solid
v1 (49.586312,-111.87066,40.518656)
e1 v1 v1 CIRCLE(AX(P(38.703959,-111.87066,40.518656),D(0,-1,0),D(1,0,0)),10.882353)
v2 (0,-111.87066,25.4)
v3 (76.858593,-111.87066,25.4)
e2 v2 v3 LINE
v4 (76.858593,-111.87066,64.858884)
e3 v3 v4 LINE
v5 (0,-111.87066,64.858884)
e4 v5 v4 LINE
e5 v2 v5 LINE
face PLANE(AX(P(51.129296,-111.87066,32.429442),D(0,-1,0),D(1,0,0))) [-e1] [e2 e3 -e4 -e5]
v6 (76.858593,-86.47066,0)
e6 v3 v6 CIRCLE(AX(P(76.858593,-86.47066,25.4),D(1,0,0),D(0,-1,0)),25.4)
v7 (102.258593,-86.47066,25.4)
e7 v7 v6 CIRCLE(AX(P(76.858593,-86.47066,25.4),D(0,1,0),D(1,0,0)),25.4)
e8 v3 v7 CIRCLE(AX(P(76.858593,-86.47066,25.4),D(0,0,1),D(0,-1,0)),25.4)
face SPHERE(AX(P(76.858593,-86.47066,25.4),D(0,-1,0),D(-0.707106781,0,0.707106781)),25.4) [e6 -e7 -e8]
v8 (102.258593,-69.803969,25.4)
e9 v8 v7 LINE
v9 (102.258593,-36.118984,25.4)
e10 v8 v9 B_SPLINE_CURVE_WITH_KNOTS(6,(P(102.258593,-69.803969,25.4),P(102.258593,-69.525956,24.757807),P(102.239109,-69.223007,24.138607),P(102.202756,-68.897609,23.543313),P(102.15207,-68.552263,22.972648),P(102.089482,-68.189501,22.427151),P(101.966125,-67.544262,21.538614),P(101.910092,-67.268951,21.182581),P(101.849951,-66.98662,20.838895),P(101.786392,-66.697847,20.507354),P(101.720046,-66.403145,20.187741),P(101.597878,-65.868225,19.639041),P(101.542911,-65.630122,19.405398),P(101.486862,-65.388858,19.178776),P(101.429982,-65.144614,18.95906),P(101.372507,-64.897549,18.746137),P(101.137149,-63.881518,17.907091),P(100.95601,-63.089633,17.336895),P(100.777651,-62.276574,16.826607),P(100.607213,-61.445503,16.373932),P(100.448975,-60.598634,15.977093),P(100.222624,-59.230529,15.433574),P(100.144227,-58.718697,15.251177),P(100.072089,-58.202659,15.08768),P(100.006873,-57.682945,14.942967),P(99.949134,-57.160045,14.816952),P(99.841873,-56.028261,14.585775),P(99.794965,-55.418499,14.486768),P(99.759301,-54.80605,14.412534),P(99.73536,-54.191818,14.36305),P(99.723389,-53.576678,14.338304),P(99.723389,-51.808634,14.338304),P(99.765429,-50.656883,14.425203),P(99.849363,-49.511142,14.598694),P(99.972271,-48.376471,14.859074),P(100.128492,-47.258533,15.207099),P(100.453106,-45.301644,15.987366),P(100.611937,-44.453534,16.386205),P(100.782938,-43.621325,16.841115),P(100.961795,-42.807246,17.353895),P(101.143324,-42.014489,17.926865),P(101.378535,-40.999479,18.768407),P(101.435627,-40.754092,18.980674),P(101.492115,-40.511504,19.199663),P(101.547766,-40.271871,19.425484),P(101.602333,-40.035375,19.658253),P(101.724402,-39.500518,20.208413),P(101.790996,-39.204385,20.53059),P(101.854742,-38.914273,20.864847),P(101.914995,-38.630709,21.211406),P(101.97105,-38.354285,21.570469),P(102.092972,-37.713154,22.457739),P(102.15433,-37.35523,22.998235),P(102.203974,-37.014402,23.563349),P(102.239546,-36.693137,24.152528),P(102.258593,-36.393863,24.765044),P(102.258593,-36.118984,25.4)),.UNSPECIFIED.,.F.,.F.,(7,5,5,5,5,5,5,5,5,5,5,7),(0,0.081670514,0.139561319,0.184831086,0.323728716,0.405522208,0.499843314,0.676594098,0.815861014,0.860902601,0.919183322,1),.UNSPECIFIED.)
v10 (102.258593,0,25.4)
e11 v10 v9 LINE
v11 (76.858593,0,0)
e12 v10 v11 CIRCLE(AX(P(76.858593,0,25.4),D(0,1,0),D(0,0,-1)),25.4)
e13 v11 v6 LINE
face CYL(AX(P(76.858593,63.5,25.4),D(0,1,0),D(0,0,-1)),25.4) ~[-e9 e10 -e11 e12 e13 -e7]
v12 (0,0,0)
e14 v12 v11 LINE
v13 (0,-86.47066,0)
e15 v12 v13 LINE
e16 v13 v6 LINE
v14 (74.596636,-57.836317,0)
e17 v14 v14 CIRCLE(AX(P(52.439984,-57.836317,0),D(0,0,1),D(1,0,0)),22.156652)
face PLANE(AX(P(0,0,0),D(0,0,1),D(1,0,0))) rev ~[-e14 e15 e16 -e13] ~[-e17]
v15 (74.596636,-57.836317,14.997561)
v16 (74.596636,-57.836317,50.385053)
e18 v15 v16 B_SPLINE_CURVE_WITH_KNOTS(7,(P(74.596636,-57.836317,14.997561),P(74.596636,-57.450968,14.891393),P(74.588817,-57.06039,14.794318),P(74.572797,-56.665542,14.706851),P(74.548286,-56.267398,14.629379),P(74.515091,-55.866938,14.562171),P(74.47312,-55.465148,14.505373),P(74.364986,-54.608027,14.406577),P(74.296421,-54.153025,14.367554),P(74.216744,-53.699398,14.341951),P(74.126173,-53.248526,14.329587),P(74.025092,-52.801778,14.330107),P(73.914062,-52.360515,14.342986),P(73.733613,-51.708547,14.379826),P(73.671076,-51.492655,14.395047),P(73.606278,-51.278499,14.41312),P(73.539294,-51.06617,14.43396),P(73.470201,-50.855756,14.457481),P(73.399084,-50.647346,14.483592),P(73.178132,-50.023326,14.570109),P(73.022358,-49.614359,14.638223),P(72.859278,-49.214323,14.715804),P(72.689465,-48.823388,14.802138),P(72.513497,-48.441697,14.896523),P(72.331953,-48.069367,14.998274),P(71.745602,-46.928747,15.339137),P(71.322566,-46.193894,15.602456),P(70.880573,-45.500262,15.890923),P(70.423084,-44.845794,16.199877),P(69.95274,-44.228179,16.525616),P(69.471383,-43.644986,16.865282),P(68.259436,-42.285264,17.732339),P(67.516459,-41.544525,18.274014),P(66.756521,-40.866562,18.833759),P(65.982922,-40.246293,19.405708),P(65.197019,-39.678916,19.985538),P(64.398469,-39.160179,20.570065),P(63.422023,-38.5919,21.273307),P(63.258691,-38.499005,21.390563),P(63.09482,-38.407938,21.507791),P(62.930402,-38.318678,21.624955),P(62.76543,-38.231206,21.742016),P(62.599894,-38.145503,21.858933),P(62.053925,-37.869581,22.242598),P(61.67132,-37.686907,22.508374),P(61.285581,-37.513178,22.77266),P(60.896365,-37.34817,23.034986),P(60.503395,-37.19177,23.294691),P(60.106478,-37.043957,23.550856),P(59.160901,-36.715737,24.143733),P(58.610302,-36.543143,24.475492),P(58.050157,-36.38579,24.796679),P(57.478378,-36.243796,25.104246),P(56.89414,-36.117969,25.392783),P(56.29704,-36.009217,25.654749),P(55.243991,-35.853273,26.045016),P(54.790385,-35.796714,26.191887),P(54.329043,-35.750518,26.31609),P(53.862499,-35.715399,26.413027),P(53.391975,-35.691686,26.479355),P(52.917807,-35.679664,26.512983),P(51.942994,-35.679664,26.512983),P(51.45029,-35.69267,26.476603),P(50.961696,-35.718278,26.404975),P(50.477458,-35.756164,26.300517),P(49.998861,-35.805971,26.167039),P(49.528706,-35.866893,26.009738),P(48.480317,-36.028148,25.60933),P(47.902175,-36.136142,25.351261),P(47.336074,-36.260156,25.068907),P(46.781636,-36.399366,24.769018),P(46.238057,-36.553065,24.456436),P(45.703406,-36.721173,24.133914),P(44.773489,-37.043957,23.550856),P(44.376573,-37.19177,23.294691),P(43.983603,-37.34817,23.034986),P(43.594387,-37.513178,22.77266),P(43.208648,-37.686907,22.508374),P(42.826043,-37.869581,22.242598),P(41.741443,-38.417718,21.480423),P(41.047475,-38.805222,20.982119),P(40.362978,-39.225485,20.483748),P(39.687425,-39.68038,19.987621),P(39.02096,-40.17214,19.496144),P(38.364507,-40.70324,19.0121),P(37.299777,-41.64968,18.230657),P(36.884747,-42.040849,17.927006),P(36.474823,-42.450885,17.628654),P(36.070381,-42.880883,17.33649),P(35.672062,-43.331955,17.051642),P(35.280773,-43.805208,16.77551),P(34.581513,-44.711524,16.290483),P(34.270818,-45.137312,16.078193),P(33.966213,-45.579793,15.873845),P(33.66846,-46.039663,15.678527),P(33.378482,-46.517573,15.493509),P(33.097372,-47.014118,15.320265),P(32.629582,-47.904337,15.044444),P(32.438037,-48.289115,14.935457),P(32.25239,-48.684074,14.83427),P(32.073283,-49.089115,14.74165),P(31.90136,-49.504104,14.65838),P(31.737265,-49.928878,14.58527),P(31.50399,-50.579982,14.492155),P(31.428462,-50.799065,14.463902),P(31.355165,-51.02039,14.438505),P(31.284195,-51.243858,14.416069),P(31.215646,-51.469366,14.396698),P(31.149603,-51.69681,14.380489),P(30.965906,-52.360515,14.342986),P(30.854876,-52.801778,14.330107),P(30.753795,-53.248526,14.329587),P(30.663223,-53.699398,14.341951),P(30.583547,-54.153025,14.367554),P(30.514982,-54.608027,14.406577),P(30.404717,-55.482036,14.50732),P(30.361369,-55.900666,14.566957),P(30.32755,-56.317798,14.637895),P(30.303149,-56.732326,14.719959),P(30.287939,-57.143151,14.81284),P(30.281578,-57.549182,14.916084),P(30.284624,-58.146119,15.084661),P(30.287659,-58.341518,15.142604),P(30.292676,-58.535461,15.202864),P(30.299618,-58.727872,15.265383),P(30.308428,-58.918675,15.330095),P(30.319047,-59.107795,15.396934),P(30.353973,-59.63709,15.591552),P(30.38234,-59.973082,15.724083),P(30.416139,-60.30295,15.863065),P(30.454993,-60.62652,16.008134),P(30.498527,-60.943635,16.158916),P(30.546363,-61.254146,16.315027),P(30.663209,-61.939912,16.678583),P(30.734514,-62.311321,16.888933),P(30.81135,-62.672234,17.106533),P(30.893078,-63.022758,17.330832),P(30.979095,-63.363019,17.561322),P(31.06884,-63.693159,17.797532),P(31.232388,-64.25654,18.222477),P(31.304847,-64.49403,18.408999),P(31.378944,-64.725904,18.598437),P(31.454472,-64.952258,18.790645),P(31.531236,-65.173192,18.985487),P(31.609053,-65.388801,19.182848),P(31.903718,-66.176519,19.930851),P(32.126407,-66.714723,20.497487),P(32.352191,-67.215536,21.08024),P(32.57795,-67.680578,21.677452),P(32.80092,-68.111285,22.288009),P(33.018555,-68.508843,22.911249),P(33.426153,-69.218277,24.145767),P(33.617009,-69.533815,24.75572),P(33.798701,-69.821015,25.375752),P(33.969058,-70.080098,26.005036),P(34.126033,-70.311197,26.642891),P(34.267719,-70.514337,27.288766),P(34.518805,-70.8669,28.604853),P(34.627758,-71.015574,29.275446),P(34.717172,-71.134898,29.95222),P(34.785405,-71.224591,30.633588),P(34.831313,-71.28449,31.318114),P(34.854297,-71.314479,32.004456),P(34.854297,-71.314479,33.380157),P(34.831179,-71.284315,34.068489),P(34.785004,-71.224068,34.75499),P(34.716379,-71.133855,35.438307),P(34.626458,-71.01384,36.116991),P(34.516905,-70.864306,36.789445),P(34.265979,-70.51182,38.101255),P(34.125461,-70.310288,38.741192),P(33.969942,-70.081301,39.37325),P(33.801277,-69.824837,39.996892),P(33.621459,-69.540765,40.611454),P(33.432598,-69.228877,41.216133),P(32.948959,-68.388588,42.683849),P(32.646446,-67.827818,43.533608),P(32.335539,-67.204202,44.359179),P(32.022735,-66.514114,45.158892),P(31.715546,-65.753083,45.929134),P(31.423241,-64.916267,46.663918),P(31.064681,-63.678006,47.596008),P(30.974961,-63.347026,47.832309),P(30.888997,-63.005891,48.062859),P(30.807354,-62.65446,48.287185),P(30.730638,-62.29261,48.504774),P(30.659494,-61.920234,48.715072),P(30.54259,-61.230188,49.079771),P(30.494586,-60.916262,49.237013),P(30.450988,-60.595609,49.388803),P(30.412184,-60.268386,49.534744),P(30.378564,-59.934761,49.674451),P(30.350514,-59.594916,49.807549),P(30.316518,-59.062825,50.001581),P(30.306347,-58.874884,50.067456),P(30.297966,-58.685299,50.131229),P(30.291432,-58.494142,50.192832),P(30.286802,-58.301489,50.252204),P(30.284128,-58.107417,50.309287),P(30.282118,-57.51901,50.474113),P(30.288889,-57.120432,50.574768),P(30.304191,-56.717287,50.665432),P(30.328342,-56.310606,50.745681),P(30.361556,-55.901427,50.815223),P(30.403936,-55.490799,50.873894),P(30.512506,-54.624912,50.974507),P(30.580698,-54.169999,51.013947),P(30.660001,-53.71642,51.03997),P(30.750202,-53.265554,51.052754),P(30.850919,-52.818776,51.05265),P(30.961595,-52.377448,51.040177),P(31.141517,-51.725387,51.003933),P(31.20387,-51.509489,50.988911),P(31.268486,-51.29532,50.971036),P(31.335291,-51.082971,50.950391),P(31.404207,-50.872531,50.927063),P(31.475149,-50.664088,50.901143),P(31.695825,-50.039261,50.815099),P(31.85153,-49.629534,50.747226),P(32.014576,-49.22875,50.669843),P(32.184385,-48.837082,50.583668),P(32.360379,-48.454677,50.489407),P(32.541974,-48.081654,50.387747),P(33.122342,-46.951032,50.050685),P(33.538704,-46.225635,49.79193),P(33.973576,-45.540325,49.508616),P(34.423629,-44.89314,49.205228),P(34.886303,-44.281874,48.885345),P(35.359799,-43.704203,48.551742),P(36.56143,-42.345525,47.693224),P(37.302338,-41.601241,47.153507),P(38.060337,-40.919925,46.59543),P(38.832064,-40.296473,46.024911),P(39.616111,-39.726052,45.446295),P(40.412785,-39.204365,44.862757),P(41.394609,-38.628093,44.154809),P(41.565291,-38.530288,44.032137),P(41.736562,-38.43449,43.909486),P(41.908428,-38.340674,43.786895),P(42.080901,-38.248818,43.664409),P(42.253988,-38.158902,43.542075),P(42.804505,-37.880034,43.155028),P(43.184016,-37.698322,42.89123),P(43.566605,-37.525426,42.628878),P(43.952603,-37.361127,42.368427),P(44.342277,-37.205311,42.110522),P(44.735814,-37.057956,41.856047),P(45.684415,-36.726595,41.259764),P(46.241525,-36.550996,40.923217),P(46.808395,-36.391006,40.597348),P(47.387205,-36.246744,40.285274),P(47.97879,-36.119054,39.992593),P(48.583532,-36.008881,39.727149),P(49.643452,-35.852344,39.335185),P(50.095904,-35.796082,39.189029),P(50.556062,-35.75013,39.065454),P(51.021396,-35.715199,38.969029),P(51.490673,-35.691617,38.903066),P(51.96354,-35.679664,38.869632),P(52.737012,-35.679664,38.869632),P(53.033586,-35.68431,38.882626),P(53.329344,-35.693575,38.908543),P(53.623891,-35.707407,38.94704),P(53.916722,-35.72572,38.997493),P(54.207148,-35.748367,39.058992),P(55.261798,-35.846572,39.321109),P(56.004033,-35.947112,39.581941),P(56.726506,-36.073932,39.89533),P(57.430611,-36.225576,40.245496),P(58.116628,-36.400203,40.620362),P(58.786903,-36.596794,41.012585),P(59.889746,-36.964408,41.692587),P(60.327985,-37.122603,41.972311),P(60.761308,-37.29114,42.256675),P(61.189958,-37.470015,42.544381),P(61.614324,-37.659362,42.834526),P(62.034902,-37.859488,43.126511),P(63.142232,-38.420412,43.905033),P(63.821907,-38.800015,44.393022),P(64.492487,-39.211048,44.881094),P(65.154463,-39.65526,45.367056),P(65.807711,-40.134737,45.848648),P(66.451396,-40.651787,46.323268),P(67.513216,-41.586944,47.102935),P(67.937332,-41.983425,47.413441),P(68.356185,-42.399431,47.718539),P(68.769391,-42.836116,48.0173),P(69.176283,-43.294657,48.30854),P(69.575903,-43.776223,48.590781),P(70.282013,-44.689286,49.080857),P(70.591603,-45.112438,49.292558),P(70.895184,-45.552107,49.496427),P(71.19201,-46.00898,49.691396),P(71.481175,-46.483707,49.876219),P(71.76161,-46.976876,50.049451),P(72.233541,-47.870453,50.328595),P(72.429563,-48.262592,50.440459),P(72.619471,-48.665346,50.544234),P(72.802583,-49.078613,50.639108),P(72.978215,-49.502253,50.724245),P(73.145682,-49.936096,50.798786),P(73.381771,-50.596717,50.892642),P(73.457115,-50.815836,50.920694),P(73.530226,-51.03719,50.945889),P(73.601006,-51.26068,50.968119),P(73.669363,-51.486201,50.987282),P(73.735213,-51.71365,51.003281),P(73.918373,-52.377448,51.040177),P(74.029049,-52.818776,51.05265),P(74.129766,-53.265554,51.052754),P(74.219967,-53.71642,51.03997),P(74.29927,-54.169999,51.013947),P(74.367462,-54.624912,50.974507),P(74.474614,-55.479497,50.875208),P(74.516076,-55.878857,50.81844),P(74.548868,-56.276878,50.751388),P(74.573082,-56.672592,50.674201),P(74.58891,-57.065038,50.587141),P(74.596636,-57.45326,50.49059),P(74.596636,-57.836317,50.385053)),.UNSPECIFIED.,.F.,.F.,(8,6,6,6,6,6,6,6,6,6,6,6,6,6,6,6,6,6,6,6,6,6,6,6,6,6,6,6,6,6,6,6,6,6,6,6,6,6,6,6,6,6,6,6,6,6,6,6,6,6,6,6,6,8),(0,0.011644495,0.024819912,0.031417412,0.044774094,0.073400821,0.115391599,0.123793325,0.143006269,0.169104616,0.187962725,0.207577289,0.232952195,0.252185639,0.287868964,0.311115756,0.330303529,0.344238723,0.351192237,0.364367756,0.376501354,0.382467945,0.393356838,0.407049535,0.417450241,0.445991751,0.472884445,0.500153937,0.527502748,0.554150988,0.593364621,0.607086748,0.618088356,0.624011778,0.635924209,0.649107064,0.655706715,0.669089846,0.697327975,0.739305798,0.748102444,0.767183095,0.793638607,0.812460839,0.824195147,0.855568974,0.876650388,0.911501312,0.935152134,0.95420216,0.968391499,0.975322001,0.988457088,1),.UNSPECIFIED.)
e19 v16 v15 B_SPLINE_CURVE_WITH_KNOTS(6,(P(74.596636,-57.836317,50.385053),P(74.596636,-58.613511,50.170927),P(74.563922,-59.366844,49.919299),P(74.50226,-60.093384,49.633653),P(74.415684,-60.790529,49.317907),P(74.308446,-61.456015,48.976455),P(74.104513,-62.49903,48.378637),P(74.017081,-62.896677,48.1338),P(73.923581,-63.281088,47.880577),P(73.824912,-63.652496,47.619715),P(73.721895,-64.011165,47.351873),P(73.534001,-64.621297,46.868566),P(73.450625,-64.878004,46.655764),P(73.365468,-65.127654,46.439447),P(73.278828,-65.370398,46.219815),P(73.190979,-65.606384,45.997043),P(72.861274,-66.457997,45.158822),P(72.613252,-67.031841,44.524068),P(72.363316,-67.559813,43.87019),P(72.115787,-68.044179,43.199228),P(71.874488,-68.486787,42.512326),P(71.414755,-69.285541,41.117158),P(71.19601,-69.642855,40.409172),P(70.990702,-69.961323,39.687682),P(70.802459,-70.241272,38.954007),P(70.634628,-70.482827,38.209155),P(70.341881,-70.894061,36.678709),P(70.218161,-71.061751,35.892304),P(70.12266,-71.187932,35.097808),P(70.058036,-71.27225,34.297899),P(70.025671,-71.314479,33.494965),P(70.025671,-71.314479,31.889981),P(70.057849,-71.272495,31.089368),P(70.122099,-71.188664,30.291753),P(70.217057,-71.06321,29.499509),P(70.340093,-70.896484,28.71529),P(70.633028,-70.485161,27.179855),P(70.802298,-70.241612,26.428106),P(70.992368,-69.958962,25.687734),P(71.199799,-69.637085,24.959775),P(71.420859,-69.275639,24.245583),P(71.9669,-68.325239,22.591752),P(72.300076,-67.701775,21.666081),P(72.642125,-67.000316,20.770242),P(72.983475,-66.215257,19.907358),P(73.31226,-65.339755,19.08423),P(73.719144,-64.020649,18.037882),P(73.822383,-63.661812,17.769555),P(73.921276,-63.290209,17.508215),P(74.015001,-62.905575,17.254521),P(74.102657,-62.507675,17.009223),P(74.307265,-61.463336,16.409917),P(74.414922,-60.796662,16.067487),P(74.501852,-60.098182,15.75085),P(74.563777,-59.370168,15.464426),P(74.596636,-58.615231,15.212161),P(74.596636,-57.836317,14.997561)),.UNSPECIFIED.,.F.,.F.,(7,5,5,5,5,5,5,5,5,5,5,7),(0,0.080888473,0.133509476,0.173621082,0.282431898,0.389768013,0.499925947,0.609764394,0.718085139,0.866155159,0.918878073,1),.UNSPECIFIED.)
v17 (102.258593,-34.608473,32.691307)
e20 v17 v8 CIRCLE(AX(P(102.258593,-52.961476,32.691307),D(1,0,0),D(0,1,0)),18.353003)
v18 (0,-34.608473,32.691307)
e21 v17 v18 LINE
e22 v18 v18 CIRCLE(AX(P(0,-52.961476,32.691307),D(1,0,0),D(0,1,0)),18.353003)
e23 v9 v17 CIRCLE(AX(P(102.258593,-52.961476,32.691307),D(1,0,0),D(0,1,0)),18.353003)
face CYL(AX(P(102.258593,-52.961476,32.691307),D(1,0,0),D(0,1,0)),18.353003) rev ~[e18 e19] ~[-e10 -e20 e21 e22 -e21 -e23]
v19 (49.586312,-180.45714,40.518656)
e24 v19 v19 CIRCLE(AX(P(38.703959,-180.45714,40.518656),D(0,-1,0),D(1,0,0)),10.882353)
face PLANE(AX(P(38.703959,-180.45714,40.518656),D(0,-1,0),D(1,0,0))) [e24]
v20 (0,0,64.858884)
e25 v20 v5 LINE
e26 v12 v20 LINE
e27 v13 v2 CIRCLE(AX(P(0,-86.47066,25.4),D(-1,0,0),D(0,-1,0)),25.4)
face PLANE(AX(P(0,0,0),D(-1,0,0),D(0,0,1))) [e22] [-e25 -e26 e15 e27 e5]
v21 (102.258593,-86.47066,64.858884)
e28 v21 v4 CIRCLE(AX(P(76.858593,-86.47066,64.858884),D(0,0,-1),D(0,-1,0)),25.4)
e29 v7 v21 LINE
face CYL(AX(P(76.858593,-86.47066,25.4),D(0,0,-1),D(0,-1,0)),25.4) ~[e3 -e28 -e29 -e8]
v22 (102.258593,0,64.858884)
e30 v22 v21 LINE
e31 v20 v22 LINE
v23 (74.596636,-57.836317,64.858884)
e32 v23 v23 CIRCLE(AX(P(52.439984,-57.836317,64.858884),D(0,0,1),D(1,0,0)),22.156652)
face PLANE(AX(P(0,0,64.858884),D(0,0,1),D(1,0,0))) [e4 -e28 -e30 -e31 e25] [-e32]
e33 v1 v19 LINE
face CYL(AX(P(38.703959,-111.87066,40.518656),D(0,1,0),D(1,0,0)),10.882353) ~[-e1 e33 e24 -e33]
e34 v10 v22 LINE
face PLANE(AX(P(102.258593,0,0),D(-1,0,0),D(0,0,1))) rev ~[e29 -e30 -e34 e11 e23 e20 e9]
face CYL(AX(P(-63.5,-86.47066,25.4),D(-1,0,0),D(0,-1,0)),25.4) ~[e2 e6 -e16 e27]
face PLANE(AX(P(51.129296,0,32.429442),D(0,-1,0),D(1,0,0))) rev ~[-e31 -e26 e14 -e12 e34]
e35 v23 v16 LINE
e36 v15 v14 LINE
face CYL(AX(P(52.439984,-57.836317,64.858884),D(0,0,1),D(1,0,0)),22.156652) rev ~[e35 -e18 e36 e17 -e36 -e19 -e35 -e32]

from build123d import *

# Parameters (mm, degrees)
F0_W         = 102.258592844
F0_H         = 64.8588836193
F1_DEPTH     = 111.87066
F2_R         = 22.1566524367
F3_DEPTH     = 123.47648
F4_R         = 18.3530030386
F5_DEPTH     = 205.67378
F6_T1_DEPTH  = 140.358592844
F6_T3_DEPTH  = 102.9588836193
F6_T5_DEPTH  = 149.97066
F6_S9_W      = 25.4
F6_S9_H      = 25.4
F6_T10_DEPTH = 25.4
F7_R         = 10.8823528673
F8_DEPTH     = 68.58648


# Not quite as in the source:
# - a fillet or chamfer that OpenCascade refuses, or shapes differently, is made with other operations: its cross-section is extruded or revolved along the edge and cut away or added


with BuildPart() as f1:
    # F0 (on Front) → F1 (new body)
    with BuildSketch(Plane.XZ):
        with Locations((51.129296422, 32.4294418097)):
            Rectangle(F0_W, F0_H)
    extrude(amount=F1_DEPTH)

    # F2 (on face) → F3 (cut)
    with BuildSketch(Plane.XY.offset(64.8588836193)):
        with Locations((52.4399839342, -57.8363165259)):
            Circle(F2_R)
    extrude(amount=-F3_DEPTH, mode=Mode.SUBTRACT)

    # F4 (on face) → F5 (cut)
    with BuildSketch(Plane.YZ.offset(102.258592844)):
        with Locations((-52.9614761472, 32.6913073659)):
            Circle(F4_R)
    extrude(amount=-F5_DEPTH, mode=Mode.SUBTRACT)

    # F6: fillet of radius 25.4 on 3 edges, made by hand

    # F6_s2 → F6_t1 (cut)
    with BuildSketch(Plane.YZ.offset(-63.5)):
        with BuildLine():
            ThreePointArc((-111.87066, 25.4), (-104.4311722421, 7.4394877579), (-86.47066, 0))
            Line((-86.47066, 0), (-111.87066, 0))
            Line((-111.87066, 0), (-111.87066, 25.4))
        make_face()
    extrude(amount=F6_T1_DEPTH, mode=Mode.SUBTRACT)

    # F6_s4 → F6_t3 (cut)
    with BuildSketch(Plane.XY.offset(25.4)):
        with BuildLine():
            ThreePointArc((76.858592844, -111.87066), (94.8191050861, -104.4311722421), (102.258592844, -86.47066))
            Line((102.258592844, -86.47066), (102.258592844, -111.87066))
            Line((102.258592844, -111.87066), (76.858592844, -111.87066))
        make_face()
    extrude(amount=F6_T3_DEPTH, mode=Mode.SUBTRACT)

    # F6_s6 → F6_t5 (cut)
    with BuildSketch(Plane.XZ.offset(-63.5)):
        with BuildLine():
            ThreePointArc((76.858592844, 0), (94.8191050861, 7.4394877579), (102.258592844, 25.4))
            Line((102.258592844, 25.4), (102.258592844, 0))
            Line((102.258592844, 0), (76.858592844, 0))
        make_face()
    extrude(amount=F6_T5_DEPTH, mode=Mode.SUBTRACT)


with BuildPart() as f6_tool8:
    # F6_s9 → F6_t10 (new body)
    with BuildSketch(Plane.XZ.offset(86.47066)):
        with Locations((89.558592844, 12.7)):
            Rectangle(F6_S9_W, F6_S9_H)
    extrude(amount=F6_T10_DEPTH)

    # F6_s11 → F6_t12 (revolve, cut)
    with BuildSketch(Plane(origin=(76.858592844, -86.47066, 25.4), x_dir=(-0.7071067812, 0, 0.7071067812), z_dir=(0.7071067812, 0, 0.7071067812))):
        with BuildLine():
            ThreePointArc((0, -25.4), (25.4, 0), (0, 25.4))
            Line((0, 25.4), (0, -25.4))
        make_face()
    revolve(axis=Axis((76.858592844, -86.47066, 25.4), (0, -1, 0)), mode=Mode.SUBTRACT)


with BuildPart() as f1_1:
    add(f1.part)

    # F6_t7: cut F6_tool8
    add(f6_tool8.part, mode=Mode.SUBTRACT)

    # F7 (on face) → F8 (join)
    with BuildSketch(Plane.XZ.offset(111.87066)):
        with Locations((38.7039594352, 40.518656373)):
            Circle(F7_R)
    extrude(amount=F8_DEPTH)


solid = f1_1.part
